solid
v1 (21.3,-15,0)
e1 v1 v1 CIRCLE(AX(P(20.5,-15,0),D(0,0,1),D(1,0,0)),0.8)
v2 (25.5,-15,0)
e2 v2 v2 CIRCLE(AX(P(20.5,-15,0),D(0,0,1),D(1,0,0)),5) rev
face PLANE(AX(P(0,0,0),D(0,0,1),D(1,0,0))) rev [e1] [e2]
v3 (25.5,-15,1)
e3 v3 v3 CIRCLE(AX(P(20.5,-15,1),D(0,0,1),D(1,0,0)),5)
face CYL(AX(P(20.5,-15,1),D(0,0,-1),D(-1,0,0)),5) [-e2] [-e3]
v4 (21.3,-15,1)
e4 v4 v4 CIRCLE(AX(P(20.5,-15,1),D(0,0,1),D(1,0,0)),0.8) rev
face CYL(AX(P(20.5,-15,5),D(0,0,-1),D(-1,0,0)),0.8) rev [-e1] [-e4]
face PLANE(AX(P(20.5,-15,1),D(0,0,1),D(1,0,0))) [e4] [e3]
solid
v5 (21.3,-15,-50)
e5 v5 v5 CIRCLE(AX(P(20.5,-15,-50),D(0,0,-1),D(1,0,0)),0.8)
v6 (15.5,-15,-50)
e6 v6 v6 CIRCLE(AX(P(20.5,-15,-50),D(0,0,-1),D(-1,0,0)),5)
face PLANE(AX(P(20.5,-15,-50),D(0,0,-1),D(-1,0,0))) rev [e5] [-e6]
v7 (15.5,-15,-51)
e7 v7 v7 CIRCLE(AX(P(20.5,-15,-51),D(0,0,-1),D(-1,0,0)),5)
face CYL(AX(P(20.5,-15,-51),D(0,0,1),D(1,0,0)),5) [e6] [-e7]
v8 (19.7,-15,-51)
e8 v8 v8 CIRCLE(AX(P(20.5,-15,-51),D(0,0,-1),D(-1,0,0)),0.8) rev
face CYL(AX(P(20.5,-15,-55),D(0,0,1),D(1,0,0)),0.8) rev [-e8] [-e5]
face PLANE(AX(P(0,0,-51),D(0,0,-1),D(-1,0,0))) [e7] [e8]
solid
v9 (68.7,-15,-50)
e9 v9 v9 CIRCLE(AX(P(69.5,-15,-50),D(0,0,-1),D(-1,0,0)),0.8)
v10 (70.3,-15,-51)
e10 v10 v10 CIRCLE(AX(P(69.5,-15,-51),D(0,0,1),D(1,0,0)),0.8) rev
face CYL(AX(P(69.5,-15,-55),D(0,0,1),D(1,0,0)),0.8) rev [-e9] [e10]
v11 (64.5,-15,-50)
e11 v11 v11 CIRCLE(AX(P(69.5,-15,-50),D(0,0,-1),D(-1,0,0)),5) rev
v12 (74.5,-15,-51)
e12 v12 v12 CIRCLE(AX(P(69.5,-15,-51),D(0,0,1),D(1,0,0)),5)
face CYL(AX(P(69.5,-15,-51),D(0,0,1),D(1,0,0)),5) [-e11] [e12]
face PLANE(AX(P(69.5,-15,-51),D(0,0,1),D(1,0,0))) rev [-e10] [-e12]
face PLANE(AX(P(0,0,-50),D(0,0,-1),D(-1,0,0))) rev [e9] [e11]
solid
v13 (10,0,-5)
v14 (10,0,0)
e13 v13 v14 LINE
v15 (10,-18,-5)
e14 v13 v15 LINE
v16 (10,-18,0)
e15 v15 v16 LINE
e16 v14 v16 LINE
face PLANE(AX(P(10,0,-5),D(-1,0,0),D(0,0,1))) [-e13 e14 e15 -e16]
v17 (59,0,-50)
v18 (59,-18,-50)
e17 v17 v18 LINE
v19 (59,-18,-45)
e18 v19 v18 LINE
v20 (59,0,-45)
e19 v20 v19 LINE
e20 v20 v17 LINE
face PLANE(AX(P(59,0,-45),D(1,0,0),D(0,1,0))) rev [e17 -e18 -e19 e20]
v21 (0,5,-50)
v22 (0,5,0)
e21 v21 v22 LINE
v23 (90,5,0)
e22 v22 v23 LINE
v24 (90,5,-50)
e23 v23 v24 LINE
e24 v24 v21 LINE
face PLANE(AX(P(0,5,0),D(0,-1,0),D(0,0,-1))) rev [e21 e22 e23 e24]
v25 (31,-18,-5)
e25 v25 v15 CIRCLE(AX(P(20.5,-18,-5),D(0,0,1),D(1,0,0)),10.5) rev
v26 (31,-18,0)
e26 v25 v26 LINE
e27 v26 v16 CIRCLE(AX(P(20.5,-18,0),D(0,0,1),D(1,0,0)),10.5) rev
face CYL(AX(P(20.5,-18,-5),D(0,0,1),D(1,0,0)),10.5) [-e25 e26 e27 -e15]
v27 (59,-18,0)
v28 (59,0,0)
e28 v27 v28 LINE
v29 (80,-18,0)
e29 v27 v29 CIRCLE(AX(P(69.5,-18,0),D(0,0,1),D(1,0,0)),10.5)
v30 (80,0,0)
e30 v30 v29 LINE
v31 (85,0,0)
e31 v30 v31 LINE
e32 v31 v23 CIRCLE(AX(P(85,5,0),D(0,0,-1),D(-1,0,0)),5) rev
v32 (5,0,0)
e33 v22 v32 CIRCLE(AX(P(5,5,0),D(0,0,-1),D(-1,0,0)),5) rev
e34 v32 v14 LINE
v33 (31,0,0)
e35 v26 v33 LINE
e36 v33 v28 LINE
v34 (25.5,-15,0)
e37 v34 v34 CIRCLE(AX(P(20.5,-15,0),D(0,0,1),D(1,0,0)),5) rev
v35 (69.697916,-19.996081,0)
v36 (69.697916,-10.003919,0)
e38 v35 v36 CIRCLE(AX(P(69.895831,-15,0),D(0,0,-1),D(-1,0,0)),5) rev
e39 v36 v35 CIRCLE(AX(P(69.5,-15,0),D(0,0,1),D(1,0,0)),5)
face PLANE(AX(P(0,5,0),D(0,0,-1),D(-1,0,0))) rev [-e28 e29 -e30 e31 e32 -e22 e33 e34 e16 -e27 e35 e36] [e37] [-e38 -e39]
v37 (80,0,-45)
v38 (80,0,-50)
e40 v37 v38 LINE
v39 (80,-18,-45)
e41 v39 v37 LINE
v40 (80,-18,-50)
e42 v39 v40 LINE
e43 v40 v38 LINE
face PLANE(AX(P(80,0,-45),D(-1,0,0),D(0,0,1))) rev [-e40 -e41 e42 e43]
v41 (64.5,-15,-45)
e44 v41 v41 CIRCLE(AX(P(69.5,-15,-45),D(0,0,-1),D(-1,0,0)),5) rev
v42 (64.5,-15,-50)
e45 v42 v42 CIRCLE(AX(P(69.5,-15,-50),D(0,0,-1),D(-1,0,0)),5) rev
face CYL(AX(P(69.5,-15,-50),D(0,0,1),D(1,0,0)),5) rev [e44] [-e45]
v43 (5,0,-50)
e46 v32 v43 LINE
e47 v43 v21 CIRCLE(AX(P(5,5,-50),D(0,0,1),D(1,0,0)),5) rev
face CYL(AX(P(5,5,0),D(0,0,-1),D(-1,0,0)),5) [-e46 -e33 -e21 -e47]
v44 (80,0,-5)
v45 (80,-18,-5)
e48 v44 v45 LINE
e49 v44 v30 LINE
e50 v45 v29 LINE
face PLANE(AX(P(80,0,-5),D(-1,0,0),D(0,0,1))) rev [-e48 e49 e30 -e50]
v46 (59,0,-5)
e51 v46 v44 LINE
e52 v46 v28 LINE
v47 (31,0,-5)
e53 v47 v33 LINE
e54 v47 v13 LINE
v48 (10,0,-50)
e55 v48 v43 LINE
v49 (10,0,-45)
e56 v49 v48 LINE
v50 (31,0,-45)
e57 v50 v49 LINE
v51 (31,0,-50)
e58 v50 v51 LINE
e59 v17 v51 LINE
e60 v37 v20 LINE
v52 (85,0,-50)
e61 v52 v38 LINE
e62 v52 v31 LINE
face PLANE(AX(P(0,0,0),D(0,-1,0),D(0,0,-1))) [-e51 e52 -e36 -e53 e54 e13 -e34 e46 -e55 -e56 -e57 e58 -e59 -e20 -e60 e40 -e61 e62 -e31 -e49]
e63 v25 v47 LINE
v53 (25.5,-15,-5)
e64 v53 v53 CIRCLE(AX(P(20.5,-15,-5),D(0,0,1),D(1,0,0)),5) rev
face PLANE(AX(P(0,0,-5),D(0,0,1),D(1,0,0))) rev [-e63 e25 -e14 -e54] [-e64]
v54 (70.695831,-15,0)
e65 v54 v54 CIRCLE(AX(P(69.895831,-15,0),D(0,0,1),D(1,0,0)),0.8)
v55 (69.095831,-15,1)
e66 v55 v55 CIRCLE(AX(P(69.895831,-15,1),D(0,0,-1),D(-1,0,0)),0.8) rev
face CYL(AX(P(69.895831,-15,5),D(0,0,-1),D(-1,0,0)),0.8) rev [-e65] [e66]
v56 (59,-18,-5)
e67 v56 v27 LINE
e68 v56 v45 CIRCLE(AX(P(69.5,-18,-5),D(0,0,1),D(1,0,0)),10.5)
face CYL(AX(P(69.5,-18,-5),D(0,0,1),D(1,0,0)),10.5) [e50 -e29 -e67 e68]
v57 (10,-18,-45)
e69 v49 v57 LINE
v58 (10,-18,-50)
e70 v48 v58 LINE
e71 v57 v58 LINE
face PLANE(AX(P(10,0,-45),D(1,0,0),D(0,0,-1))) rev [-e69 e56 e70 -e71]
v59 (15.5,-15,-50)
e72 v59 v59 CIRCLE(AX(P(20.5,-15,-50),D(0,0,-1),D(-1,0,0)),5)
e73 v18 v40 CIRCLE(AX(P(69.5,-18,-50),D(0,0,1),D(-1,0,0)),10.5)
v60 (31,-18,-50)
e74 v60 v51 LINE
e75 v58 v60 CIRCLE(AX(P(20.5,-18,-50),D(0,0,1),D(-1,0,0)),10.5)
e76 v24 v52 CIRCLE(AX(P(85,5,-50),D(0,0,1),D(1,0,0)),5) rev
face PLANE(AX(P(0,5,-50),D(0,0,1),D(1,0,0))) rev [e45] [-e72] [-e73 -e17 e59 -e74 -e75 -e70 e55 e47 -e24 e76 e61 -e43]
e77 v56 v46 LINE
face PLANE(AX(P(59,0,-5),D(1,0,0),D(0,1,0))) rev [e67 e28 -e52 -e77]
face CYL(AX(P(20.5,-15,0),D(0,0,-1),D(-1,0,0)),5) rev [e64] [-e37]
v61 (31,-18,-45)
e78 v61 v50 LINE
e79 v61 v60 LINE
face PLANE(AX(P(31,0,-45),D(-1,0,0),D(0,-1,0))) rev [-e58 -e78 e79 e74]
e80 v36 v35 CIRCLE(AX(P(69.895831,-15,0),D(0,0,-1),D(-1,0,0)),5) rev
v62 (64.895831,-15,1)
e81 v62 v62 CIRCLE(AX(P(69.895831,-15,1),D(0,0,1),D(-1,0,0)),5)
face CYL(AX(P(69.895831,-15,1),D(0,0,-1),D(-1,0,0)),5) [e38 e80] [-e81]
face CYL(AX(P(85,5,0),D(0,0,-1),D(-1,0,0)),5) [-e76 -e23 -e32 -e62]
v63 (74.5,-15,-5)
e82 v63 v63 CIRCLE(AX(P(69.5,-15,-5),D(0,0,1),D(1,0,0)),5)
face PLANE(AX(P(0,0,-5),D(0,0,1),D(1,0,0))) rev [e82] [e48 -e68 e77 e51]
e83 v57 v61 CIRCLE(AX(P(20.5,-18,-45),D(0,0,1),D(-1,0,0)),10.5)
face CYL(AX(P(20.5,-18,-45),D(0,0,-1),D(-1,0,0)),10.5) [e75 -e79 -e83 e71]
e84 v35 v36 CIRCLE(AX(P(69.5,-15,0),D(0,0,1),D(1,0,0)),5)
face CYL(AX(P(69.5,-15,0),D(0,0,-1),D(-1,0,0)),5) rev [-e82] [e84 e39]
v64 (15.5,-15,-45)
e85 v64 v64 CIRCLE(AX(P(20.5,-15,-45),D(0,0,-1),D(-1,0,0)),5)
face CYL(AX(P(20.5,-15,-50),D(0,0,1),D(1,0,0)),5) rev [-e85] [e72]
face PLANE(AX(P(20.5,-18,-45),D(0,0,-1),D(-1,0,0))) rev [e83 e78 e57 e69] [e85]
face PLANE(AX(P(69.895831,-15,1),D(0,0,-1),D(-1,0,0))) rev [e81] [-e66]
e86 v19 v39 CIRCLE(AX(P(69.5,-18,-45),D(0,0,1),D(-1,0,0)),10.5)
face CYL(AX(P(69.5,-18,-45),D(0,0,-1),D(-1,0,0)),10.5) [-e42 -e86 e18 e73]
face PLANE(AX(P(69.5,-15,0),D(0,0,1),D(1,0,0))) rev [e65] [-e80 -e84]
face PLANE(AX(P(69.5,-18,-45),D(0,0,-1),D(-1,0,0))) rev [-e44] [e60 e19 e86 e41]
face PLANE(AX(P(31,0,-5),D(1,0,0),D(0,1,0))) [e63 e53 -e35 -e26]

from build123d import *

# Parameters (mm, degrees)
SKETCH1_W           = 90
SKETCH1_H           = 50
BOSS_EXTRUDE1_DEPTH = 5
FILLET6_R           = 5
FILLET7_R           = 5
SKETCH2_R           = 5
BOSS_EXTRUDE3_DEPTH = 5
BOSS_EXTRUDE4_START = -45
BOSS_EXTRUDE4_DEPTH = 5
SKETCH9_R           = 5
BOSS_EXTRUDE5_DEPTH = 1
CUT_EXTRUDE1_START  = -5
SKETCH11_R          = 5
CUT_EXTRUDE1_DEPTH  = 5
SKETCH12_R          = 5
BOSS_EXTRUDE7_DEPTH = 1
CUT_EXTRUDE2_START  = -5
SKETCH14_R          = 5
CUT_EXTRUDE2_DEPTH  = 5
SKETCH16_R          = 0.8
CUT_EXTRUDE6_DEPTH  = 5
SKETCH17_R          = 0.8
CUT_EXTRUDE8_DEPTH  = 5


with BuildPart() as part:
    # Sketch1 → Boss-Extrude1 (new body)
    with BuildSketch(Plane(origin=(0, 0, 0), x_dir=(1, 0, 0), z_dir=(0, 1, 0))):
        with Locations((45, 25)):
            Rectangle(SKETCH1_W, SKETCH1_H)
    extrude(amount=BOSS_EXTRUDE1_DEPTH)

    # Fillet6
    fillet6_edges = [part.edges().sort_by_distance(p)[0] for p in [
        (90, 0, -25),
    ]]
    fillet(fillet6_edges, radius=FILLET6_R - 0.0001)  # a hair under: the kernel refuses the full size

    # Fillet7
    fillet7_edges = [part.edges().sort_by_distance(p)[0] for p in [
        (0, 0, -25),
    ]]
    fillet(fillet7_edges, radius=FILLET7_R - 0.0001)  # a hair under: the kernel refuses the full size

    # Sketch2 → Boss-Extrude3 (add)
    # profile 1 of 4: a face of its own
    with BuildSketch(Plane.XY):
        with BuildLine():
            ThreePointArc((31, -18), (20.5, -28.5), (10, -18))
            Line((10, -18), (10, 0))
            Line((10, 0), (31, 0))
            Line((31, 0), (31, -18))
        make_face()
        with Locations((20.5, -15)):
            Circle(SKETCH2_R, mode=Mode.SUBTRACT)
    # profile 2 of 4: a face of its own
    with BuildSketch(Plane.XY):
        with BuildLine():
            Line((59, -18), (59, 0))
            Line((59, 0), (80, 0))
            Line((80, 0), (80, -18))
            ThreePointArc((80, -18), (69.5, -28.5), (59, -18))
        make_face()
        with Locations((69.5, -15)):
            Circle(SKETCH2_R, mode=Mode.SUBTRACT)
    # profile 3 of 4: a face of its own
    with BuildSketch(Plane.XY):
        with Locations((20.5, -15)):
            Circle(SKETCH2_R)
    # profile 4 of 4: a face of its own
    with BuildSketch(Plane.XY):
        with Locations((69.5, -15)):
            Circle(SKETCH2_R)
    extrude(amount=-BOSS_EXTRUDE3_DEPTH)

    # Sketch7 → Boss-Extrude4 (add)
    with BuildSketch(Plane.XY.offset(BOSS_EXTRUDE4_START)):
        with BuildLine():
            Line((80, 0), (80, -18))
            ThreePointArc((80, -18), (69.5, -28.5), (59, -18))
            Line((59, -18), (59, 0))
            Line((59, 0), (80, 0))
        make_face()
        with BuildLine():
            Line((31, 0), (31, -18))
            ThreePointArc((31, -18), (20.5, -28.5), (10, -18))
            Line((10, -18), (10, 0))
            Line((10, 0), (31, 0))
        make_face()
    extrude(amount=-BOSS_EXTRUDE4_DEPTH)

    # Sketch9 → Boss-Extrude5 (add)
    with BuildSketch(Plane.XY):
        with Locations(Location((20.5, -15, 0), (0, 0, 180))):
            Circle(SKETCH9_R)
        with Locations(Location((69.895831462, -15, 0), (0, 0, 180))):
            Circle(SKETCH9_R)
    extrude(amount=BOSS_EXTRUDE5_DEPTH)

    # Sketch11 → Cut-Extrude1 (cut)
    with BuildSketch(Plane.XY.offset(CUT_EXTRUDE1_START)):
        with Locations((20.5, -15)):
            Circle(SKETCH11_R)
        with Locations(Location((69.5, -15, 0), (0, 0, 272.268539879))):
            Circle(SKETCH11_R)
    extrude(amount=CUT_EXTRUDE1_DEPTH, mode=Mode.SUBTRACT)


with BuildPart() as cut_extrude1_piece_1:
    # of the separate pieces the step leaves, piece 1, a body of its own (cut_extrude1_pieces)
    add(part.part.solids().sort_by_distance((4.9999, 0, 0))[0])

    # Sketch12 → Boss-Extrude7 (add)
    with BuildSketch(Plane.XY.offset(-50)):
        with Locations((20.5, -15)):
            Circle(SKETCH12_R)
        with Locations(Location((69.5, -15, 0), (0, 0, 272.268539879))):
            Circle(SKETCH12_R)
    extrude(amount=-BOSS_EXTRUDE7_DEPTH)

    # Sketch14 → Cut-Extrude2 (cut)
    with BuildSketch(Plane(origin=(0, 0, -50), x_dir=(-1, 0, 0), z_dir=(0, 0, -1)).offset(CUT_EXTRUDE2_START)):
        with Locations(Location((-69.5, -15, 0), (0, 0, 267.731460121))):
            Circle(SKETCH14_R)
        with Locations(Location((-20.5, -15, 0), (0, 0, 180))):
            Circle(SKETCH14_R)
    extrude(amount=CUT_EXTRUDE2_DEPTH, mode=Mode.SUBTRACT)


with BuildPart() as cut_extrude1_piece_2:
    # of the separate pieces the step leaves, piece 2, a body of its own (cut_extrude1_pieces)
    add(part.part.solids().sort_by_distance((15.5, -15, 1))[0])


with BuildPart() as cut_extrude2_piece_1:
    # of the separate pieces the step leaves, piece 1, a body of its own (cut_extrude2_pieces)
    add(cut_extrude1_piece_1.part.solids().sort_by_distance((4.9999, 0, 0))[0])


with BuildPart() as cut_extrude2_piece_2:
    # of the separate pieces the step leaves, piece 2, a body of its own (cut_extrude2_pieces)
    add(cut_extrude1_piece_1.part.solids().sort_by_distance((25.5, -15, -51))[0])


with BuildPart() as cut_extrude2_piece_3:
    # of the separate pieces the step leaves, piece 3, a body of its own (cut_extrude2_pieces)
    add(cut_extrude1_piece_1.part.solids().sort_by_distance((69.697915731, -19.996081401, -51))[0])


with BuildPart() as cut_extrude6_tool:
    # Sketch16 → Cut-Extrude6 (new body)
    with BuildSketch(Plane(origin=(0, 0, -50), x_dir=(-1, 0, 0), z_dir=(0, 0, -1))):
        with Locations(Location((-69.5, -15, 0), (0, 0, 180))):
            Circle(SKETCH16_R)
        with Locations(Location((-20.5, -15, 0), (0, 0, 180))):
            Circle(SKETCH16_R)
    extrude(amount=CUT_EXTRUDE6_DEPTH)


with BuildPart() as cut_extrude2_piece_2_1:
    add(cut_extrude2_piece_2.part)

    # Cut-Extrude6: cut by cut_extrude6_tool
    add(cut_extrude6_tool.part, mode=Mode.SUBTRACT)


with BuildPart() as cut_extrude2_piece_3_1:
    add(cut_extrude2_piece_3.part)

    # Cut-Extrude6: cut by cut_extrude6_tool
    add(cut_extrude6_tool.part, mode=Mode.SUBTRACT)


with BuildPart() as cut_extrude8_tool:
    # Sketch17 → Cut-Extrude8 (new body)
    with BuildSketch(Plane.XY):
        with Locations((20.5, -15)):
            Circle(SKETCH17_R)
        with Locations(Location((69.895831462, -15, 0), (0, 0, 180))):
            Circle(SKETCH17_R)
    extrude(amount=CUT_EXTRUDE8_DEPTH)


with BuildPart() as cut_extrude1_piece_2_1:
    add(cut_extrude1_piece_2.part)

    # Cut-Extrude8: cut by cut_extrude8_tool
    add(cut_extrude8_tool.part, mode=Mode.SUBTRACT)


with BuildPart() as cut_extrude2_piece_1_1:
    add(cut_extrude2_piece_1.part)

    # Cut-Extrude8: cut by cut_extrude8_tool
    add(cut_extrude8_tool.part, mode=Mode.SUBTRACT)


solid = Compound([cut_extrude2_piece_2_1.part, cut_extrude2_piece_3_1.part, cut_extrude1_piece_2_1.part, cut_extrude2_piece_1_1.part])
